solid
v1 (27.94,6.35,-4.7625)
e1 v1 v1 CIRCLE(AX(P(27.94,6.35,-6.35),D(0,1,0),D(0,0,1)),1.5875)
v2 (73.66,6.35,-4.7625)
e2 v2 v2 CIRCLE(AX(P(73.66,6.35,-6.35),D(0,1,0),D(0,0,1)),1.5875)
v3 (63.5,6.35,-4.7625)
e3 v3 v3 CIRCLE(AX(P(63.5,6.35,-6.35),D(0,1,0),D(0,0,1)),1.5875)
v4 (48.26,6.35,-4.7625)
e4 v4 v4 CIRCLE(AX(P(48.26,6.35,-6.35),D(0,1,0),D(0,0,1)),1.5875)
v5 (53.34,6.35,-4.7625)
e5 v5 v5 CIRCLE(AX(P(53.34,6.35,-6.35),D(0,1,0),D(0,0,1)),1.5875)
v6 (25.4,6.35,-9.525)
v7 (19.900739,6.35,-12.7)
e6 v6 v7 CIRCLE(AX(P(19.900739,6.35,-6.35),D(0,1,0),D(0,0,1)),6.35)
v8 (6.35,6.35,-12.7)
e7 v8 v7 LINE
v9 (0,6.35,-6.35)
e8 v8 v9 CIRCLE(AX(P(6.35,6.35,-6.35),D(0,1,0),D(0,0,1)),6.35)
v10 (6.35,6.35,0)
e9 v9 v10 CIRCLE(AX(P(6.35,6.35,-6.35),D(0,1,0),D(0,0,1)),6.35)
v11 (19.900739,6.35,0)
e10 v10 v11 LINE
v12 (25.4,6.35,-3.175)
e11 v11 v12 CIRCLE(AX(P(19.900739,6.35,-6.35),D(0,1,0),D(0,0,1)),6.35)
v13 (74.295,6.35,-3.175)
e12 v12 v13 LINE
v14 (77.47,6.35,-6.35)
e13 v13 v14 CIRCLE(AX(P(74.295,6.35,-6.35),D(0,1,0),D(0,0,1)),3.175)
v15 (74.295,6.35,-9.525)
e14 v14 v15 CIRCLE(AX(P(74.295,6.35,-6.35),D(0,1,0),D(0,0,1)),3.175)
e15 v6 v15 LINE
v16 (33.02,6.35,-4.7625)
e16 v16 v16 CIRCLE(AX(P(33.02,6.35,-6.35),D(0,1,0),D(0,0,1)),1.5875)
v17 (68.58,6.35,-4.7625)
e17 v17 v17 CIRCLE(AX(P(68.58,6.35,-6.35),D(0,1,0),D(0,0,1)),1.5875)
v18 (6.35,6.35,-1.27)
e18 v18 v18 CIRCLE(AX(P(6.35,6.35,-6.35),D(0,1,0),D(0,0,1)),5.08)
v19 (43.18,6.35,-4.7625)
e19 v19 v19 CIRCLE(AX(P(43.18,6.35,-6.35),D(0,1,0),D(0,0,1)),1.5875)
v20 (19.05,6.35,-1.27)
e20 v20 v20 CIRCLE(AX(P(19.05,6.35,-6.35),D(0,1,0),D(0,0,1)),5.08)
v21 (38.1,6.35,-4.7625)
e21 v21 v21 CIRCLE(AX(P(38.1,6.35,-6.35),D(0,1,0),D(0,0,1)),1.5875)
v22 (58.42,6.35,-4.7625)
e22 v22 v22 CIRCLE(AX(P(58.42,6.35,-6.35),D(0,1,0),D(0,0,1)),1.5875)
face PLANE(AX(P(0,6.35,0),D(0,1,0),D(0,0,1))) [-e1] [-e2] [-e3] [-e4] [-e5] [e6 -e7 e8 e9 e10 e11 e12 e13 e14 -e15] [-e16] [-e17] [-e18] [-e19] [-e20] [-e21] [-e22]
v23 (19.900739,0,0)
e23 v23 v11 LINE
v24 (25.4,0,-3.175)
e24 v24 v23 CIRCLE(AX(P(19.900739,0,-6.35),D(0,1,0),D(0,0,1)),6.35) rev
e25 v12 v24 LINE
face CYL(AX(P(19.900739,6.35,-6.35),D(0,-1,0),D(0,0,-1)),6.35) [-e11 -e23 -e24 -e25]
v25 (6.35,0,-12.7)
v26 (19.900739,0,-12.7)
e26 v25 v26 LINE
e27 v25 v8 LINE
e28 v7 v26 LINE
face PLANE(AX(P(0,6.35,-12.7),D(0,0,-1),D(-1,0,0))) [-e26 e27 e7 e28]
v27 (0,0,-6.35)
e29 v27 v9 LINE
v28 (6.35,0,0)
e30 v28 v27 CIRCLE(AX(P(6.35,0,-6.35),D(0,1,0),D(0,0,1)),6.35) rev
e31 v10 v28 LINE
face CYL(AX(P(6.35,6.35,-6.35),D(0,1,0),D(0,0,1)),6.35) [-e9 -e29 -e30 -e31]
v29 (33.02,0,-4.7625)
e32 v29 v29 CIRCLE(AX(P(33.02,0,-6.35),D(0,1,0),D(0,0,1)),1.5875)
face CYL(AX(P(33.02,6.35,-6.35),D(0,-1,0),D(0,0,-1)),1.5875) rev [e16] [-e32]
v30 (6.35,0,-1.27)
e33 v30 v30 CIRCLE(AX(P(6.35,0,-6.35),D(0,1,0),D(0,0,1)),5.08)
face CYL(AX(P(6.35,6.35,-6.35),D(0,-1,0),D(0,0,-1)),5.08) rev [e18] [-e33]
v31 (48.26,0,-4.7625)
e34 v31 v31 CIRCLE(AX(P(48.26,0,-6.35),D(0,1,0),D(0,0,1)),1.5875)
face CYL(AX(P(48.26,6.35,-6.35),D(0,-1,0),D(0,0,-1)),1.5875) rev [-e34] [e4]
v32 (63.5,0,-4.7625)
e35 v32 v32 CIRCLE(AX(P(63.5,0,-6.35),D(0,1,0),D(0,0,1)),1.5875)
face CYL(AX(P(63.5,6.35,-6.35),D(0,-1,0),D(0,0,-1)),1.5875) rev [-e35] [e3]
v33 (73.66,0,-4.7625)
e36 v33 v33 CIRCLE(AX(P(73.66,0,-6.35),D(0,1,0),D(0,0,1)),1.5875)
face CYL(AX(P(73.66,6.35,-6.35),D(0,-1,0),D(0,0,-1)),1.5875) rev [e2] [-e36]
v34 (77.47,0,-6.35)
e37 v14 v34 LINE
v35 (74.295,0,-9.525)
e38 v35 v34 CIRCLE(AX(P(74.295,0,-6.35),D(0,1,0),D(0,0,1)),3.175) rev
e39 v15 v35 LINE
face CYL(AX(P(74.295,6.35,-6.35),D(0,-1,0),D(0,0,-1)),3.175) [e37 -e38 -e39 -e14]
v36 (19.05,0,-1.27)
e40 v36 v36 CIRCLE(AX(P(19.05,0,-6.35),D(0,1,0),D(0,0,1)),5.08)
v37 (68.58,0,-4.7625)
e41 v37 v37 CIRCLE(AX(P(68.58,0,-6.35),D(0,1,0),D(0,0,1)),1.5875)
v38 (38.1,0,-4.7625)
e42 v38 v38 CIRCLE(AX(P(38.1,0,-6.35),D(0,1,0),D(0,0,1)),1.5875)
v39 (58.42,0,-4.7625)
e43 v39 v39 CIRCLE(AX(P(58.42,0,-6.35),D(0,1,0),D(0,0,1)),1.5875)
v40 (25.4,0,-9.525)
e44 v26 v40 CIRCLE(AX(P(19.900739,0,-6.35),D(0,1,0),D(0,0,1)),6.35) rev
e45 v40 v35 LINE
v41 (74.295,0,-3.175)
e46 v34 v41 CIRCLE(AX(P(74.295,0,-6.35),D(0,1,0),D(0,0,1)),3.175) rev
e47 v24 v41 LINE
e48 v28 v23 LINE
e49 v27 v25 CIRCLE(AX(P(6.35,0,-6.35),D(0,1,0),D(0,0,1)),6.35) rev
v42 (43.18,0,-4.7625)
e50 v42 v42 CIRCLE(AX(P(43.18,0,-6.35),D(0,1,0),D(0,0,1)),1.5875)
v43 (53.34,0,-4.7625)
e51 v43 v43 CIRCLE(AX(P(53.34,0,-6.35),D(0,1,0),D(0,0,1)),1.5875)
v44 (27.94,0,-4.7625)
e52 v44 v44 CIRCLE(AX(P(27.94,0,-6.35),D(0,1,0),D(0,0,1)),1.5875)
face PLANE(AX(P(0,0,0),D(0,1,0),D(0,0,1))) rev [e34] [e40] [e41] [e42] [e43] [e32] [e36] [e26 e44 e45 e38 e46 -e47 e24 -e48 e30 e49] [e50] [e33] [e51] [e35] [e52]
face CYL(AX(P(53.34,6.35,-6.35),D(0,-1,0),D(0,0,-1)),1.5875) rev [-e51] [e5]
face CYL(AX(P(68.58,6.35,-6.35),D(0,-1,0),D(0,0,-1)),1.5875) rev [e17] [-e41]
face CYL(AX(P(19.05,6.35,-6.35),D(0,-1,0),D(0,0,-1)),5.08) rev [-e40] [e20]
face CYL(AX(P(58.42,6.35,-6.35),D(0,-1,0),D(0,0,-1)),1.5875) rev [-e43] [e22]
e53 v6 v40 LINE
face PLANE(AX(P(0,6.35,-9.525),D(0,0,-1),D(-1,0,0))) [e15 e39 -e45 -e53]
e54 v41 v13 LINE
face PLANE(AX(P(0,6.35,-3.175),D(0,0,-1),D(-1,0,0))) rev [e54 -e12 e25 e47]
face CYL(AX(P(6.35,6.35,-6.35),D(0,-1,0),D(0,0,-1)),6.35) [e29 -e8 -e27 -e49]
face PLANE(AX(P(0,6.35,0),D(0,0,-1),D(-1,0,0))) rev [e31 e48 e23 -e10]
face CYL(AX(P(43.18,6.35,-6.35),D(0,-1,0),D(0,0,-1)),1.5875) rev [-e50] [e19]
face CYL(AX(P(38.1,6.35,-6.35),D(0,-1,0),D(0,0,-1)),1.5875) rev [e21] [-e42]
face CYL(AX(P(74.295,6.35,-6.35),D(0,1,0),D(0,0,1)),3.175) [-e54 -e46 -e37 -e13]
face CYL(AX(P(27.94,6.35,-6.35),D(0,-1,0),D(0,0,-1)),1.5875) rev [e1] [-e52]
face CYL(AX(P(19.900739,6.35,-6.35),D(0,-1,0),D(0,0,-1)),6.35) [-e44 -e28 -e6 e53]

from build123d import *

# Parameters (mm, degrees)
SKETCH1_W           = 25.4
SKETCH1_H           = 12.7
SKETCH1_R           = 5.08
SKETCH1_W_2         = 52.07
SKETCH1_H_2         = 6.35
SKETCH1_R_2         = 1.5875
BOSS_EXTRUDE1_DEPTH = 6.35
FILLET1_R           = 6.35
FILLET2_R           = 3.175


# Some blends are built 0.0001 mm under size
with BuildPart() as part:
    # Sketch1 → Boss-Extrude1 (new body)
    # profile 1 of 2: a face of its own
    with BuildSketch(Plane(origin=(0, 0, 0), x_dir=(1, 0, 0), z_dir=(0, 1, 0))):
        with Locations((12.7, 6.35)):
            Rectangle(SKETCH1_W, SKETCH1_H)
        with Locations(Location((19.05, 6.35, 0), (0, 0, 270))):
            Circle(SKETCH1_R, mode=Mode.SUBTRACT)
        with Locations(Location((6.35, 6.35, 0), (0, 0, 270))):
            Circle(SKETCH1_R, mode=Mode.SUBTRACT)
    # profile 2 of 2: a face of its own
    with BuildSketch(Plane(origin=(0, 0, 0), x_dir=(1, 0, 0), z_dir=(0, 1, 0))):
        with Locations((51.435, 6.35)):
            Rectangle(SKETCH1_W_2, SKETCH1_H_2)
        with Locations(Location((27.94, 6.35, 0), (0, 0, 270))):
            Circle(SKETCH1_R_2, mode=Mode.SUBTRACT)
        with Locations(Location((33.02, 6.35, 0), (0, 0, 270))):
            Circle(SKETCH1_R_2, mode=Mode.SUBTRACT)
        with Locations(Location((38.1, 6.35, 0), (0, 0, 270))):
            Circle(SKETCH1_R_2, mode=Mode.SUBTRACT)
        with Locations(Location((43.18, 6.35, 0), (0, 0, 270))):
            Circle(SKETCH1_R_2, mode=Mode.SUBTRACT)
        with Locations(Location((48.26, 6.35, 0), (0, 0, 270))):
            Circle(SKETCH1_R_2, mode=Mode.SUBTRACT)
        with Locations(Location((53.34, 6.35, 0), (0, 0, 270))):
            Circle(SKETCH1_R_2, mode=Mode.SUBTRACT)
        with Locations(Location((58.42, 6.35, 0), (0, 0, 270))):
            Circle(SKETCH1_R_2, mode=Mode.SUBTRACT)
        with Locations(Location((63.5, 6.35, 0), (0, 0, 270))):
            Circle(SKETCH1_R_2, mode=Mode.SUBTRACT)
        with Locations(Location((68.58, 6.35, 0), (0, 0, 270))):
            Circle(SKETCH1_R_2, mode=Mode.SUBTRACT)
        with Locations(Location((73.66, 6.35, 0), (0, 0, 270))):
            Circle(SKETCH1_R_2, mode=Mode.SUBTRACT)
    extrude(amount=BOSS_EXTRUDE1_DEPTH)

    # Fillet1
    # the kernel refuses this fillet: 6.35 mm, written as the material it takes off along each edge
    with BuildSketch(Plane(origin=(25.4, -13.748153285, -12.7), x_dir=(-1, 0, 0), z_dir=(0, 1, 0))) as fillet1_piece_1:
        with BuildLine():
            CenterArc((5.499261314, 6.35), FILLET1_R, 210, 60)
            Line((0, 3.175), (-0.109985226, 3.1115))
            ThreePointArc((-0.109985226, 3.1115), (-0.127, 1.5875), (-0.127, 0))
            Line((-0.127, 0), (0, -0.127))
            Line((0, -0.127), (5.499261314, -0.127))
            Line((5.499261314, -0.127), (5.499261314, 0))
        make_face()
    extrude(amount=33.84630657, mode=Mode.SUBTRACT)
    with BuildSketch(Plane(origin=(25.4, -13.748153285, 0), x_dir=(-1, 0, 0), z_dir=(0, 1, 0))) as fillet1_piece_2:
        with BuildLine():
            CenterArc((5.499261314, -6.35), FILLET1_R, 90, 60)
            Line((0, -3.175), (-0.109985226, -3.1115))
            ThreePointArc((-0.109985226, -3.1115), (-0.127, -1.5875), (-0.127, 0))
            Line((-0.127, 0), (0, 0.127))
            Line((0, 0.127), (5.499261314, 0.127))
            Line((5.499261314, 0.127), (5.499261314, 0))
        make_face()
    extrude(amount=33.84630657, mode=Mode.SUBTRACT)
    with BuildSketch(Plane(origin=(0, -15.875, -12.7), x_dir=(0, 0, 1), z_dir=(0, 1, 0)), Plane(origin=(0, -15.875, 0), x_dir=(1, 0, 0), z_dir=(0, 1, 0))) as fillet1_piece_3:
        with BuildLine():
            CenterArc((FILLET1_R, FILLET1_R), FILLET1_R, 180, 90)
            Line((0, FILLET1_R), (-FILLET1_R * 0.02, FILLET1_R))
            Line((-FILLET1_R * 0.02, FILLET1_R), (-FILLET1_R * 0.02, -FILLET1_R * 0.02))
            Line((-FILLET1_R * 0.02, -FILLET1_R * 0.02), (FILLET1_R, -FILLET1_R * 0.02))
            Line((FILLET1_R, -FILLET1_R * 0.02), (FILLET1_R, 0))
        make_face()
    extrude(amount=38.1, mode=Mode.SUBTRACT)

    # Fillet2
    fillet2_edges = [part.edges().sort_by_distance(p)[0] for p in [
        (77.47, 3.175, -9.525),
        (77.47, 3.175, -3.175),
    ]]
    fillet(fillet2_edges, radius=FILLET2_R - 0.0001)  # a hair under: the kernel refuses the full size


solid = part.part
